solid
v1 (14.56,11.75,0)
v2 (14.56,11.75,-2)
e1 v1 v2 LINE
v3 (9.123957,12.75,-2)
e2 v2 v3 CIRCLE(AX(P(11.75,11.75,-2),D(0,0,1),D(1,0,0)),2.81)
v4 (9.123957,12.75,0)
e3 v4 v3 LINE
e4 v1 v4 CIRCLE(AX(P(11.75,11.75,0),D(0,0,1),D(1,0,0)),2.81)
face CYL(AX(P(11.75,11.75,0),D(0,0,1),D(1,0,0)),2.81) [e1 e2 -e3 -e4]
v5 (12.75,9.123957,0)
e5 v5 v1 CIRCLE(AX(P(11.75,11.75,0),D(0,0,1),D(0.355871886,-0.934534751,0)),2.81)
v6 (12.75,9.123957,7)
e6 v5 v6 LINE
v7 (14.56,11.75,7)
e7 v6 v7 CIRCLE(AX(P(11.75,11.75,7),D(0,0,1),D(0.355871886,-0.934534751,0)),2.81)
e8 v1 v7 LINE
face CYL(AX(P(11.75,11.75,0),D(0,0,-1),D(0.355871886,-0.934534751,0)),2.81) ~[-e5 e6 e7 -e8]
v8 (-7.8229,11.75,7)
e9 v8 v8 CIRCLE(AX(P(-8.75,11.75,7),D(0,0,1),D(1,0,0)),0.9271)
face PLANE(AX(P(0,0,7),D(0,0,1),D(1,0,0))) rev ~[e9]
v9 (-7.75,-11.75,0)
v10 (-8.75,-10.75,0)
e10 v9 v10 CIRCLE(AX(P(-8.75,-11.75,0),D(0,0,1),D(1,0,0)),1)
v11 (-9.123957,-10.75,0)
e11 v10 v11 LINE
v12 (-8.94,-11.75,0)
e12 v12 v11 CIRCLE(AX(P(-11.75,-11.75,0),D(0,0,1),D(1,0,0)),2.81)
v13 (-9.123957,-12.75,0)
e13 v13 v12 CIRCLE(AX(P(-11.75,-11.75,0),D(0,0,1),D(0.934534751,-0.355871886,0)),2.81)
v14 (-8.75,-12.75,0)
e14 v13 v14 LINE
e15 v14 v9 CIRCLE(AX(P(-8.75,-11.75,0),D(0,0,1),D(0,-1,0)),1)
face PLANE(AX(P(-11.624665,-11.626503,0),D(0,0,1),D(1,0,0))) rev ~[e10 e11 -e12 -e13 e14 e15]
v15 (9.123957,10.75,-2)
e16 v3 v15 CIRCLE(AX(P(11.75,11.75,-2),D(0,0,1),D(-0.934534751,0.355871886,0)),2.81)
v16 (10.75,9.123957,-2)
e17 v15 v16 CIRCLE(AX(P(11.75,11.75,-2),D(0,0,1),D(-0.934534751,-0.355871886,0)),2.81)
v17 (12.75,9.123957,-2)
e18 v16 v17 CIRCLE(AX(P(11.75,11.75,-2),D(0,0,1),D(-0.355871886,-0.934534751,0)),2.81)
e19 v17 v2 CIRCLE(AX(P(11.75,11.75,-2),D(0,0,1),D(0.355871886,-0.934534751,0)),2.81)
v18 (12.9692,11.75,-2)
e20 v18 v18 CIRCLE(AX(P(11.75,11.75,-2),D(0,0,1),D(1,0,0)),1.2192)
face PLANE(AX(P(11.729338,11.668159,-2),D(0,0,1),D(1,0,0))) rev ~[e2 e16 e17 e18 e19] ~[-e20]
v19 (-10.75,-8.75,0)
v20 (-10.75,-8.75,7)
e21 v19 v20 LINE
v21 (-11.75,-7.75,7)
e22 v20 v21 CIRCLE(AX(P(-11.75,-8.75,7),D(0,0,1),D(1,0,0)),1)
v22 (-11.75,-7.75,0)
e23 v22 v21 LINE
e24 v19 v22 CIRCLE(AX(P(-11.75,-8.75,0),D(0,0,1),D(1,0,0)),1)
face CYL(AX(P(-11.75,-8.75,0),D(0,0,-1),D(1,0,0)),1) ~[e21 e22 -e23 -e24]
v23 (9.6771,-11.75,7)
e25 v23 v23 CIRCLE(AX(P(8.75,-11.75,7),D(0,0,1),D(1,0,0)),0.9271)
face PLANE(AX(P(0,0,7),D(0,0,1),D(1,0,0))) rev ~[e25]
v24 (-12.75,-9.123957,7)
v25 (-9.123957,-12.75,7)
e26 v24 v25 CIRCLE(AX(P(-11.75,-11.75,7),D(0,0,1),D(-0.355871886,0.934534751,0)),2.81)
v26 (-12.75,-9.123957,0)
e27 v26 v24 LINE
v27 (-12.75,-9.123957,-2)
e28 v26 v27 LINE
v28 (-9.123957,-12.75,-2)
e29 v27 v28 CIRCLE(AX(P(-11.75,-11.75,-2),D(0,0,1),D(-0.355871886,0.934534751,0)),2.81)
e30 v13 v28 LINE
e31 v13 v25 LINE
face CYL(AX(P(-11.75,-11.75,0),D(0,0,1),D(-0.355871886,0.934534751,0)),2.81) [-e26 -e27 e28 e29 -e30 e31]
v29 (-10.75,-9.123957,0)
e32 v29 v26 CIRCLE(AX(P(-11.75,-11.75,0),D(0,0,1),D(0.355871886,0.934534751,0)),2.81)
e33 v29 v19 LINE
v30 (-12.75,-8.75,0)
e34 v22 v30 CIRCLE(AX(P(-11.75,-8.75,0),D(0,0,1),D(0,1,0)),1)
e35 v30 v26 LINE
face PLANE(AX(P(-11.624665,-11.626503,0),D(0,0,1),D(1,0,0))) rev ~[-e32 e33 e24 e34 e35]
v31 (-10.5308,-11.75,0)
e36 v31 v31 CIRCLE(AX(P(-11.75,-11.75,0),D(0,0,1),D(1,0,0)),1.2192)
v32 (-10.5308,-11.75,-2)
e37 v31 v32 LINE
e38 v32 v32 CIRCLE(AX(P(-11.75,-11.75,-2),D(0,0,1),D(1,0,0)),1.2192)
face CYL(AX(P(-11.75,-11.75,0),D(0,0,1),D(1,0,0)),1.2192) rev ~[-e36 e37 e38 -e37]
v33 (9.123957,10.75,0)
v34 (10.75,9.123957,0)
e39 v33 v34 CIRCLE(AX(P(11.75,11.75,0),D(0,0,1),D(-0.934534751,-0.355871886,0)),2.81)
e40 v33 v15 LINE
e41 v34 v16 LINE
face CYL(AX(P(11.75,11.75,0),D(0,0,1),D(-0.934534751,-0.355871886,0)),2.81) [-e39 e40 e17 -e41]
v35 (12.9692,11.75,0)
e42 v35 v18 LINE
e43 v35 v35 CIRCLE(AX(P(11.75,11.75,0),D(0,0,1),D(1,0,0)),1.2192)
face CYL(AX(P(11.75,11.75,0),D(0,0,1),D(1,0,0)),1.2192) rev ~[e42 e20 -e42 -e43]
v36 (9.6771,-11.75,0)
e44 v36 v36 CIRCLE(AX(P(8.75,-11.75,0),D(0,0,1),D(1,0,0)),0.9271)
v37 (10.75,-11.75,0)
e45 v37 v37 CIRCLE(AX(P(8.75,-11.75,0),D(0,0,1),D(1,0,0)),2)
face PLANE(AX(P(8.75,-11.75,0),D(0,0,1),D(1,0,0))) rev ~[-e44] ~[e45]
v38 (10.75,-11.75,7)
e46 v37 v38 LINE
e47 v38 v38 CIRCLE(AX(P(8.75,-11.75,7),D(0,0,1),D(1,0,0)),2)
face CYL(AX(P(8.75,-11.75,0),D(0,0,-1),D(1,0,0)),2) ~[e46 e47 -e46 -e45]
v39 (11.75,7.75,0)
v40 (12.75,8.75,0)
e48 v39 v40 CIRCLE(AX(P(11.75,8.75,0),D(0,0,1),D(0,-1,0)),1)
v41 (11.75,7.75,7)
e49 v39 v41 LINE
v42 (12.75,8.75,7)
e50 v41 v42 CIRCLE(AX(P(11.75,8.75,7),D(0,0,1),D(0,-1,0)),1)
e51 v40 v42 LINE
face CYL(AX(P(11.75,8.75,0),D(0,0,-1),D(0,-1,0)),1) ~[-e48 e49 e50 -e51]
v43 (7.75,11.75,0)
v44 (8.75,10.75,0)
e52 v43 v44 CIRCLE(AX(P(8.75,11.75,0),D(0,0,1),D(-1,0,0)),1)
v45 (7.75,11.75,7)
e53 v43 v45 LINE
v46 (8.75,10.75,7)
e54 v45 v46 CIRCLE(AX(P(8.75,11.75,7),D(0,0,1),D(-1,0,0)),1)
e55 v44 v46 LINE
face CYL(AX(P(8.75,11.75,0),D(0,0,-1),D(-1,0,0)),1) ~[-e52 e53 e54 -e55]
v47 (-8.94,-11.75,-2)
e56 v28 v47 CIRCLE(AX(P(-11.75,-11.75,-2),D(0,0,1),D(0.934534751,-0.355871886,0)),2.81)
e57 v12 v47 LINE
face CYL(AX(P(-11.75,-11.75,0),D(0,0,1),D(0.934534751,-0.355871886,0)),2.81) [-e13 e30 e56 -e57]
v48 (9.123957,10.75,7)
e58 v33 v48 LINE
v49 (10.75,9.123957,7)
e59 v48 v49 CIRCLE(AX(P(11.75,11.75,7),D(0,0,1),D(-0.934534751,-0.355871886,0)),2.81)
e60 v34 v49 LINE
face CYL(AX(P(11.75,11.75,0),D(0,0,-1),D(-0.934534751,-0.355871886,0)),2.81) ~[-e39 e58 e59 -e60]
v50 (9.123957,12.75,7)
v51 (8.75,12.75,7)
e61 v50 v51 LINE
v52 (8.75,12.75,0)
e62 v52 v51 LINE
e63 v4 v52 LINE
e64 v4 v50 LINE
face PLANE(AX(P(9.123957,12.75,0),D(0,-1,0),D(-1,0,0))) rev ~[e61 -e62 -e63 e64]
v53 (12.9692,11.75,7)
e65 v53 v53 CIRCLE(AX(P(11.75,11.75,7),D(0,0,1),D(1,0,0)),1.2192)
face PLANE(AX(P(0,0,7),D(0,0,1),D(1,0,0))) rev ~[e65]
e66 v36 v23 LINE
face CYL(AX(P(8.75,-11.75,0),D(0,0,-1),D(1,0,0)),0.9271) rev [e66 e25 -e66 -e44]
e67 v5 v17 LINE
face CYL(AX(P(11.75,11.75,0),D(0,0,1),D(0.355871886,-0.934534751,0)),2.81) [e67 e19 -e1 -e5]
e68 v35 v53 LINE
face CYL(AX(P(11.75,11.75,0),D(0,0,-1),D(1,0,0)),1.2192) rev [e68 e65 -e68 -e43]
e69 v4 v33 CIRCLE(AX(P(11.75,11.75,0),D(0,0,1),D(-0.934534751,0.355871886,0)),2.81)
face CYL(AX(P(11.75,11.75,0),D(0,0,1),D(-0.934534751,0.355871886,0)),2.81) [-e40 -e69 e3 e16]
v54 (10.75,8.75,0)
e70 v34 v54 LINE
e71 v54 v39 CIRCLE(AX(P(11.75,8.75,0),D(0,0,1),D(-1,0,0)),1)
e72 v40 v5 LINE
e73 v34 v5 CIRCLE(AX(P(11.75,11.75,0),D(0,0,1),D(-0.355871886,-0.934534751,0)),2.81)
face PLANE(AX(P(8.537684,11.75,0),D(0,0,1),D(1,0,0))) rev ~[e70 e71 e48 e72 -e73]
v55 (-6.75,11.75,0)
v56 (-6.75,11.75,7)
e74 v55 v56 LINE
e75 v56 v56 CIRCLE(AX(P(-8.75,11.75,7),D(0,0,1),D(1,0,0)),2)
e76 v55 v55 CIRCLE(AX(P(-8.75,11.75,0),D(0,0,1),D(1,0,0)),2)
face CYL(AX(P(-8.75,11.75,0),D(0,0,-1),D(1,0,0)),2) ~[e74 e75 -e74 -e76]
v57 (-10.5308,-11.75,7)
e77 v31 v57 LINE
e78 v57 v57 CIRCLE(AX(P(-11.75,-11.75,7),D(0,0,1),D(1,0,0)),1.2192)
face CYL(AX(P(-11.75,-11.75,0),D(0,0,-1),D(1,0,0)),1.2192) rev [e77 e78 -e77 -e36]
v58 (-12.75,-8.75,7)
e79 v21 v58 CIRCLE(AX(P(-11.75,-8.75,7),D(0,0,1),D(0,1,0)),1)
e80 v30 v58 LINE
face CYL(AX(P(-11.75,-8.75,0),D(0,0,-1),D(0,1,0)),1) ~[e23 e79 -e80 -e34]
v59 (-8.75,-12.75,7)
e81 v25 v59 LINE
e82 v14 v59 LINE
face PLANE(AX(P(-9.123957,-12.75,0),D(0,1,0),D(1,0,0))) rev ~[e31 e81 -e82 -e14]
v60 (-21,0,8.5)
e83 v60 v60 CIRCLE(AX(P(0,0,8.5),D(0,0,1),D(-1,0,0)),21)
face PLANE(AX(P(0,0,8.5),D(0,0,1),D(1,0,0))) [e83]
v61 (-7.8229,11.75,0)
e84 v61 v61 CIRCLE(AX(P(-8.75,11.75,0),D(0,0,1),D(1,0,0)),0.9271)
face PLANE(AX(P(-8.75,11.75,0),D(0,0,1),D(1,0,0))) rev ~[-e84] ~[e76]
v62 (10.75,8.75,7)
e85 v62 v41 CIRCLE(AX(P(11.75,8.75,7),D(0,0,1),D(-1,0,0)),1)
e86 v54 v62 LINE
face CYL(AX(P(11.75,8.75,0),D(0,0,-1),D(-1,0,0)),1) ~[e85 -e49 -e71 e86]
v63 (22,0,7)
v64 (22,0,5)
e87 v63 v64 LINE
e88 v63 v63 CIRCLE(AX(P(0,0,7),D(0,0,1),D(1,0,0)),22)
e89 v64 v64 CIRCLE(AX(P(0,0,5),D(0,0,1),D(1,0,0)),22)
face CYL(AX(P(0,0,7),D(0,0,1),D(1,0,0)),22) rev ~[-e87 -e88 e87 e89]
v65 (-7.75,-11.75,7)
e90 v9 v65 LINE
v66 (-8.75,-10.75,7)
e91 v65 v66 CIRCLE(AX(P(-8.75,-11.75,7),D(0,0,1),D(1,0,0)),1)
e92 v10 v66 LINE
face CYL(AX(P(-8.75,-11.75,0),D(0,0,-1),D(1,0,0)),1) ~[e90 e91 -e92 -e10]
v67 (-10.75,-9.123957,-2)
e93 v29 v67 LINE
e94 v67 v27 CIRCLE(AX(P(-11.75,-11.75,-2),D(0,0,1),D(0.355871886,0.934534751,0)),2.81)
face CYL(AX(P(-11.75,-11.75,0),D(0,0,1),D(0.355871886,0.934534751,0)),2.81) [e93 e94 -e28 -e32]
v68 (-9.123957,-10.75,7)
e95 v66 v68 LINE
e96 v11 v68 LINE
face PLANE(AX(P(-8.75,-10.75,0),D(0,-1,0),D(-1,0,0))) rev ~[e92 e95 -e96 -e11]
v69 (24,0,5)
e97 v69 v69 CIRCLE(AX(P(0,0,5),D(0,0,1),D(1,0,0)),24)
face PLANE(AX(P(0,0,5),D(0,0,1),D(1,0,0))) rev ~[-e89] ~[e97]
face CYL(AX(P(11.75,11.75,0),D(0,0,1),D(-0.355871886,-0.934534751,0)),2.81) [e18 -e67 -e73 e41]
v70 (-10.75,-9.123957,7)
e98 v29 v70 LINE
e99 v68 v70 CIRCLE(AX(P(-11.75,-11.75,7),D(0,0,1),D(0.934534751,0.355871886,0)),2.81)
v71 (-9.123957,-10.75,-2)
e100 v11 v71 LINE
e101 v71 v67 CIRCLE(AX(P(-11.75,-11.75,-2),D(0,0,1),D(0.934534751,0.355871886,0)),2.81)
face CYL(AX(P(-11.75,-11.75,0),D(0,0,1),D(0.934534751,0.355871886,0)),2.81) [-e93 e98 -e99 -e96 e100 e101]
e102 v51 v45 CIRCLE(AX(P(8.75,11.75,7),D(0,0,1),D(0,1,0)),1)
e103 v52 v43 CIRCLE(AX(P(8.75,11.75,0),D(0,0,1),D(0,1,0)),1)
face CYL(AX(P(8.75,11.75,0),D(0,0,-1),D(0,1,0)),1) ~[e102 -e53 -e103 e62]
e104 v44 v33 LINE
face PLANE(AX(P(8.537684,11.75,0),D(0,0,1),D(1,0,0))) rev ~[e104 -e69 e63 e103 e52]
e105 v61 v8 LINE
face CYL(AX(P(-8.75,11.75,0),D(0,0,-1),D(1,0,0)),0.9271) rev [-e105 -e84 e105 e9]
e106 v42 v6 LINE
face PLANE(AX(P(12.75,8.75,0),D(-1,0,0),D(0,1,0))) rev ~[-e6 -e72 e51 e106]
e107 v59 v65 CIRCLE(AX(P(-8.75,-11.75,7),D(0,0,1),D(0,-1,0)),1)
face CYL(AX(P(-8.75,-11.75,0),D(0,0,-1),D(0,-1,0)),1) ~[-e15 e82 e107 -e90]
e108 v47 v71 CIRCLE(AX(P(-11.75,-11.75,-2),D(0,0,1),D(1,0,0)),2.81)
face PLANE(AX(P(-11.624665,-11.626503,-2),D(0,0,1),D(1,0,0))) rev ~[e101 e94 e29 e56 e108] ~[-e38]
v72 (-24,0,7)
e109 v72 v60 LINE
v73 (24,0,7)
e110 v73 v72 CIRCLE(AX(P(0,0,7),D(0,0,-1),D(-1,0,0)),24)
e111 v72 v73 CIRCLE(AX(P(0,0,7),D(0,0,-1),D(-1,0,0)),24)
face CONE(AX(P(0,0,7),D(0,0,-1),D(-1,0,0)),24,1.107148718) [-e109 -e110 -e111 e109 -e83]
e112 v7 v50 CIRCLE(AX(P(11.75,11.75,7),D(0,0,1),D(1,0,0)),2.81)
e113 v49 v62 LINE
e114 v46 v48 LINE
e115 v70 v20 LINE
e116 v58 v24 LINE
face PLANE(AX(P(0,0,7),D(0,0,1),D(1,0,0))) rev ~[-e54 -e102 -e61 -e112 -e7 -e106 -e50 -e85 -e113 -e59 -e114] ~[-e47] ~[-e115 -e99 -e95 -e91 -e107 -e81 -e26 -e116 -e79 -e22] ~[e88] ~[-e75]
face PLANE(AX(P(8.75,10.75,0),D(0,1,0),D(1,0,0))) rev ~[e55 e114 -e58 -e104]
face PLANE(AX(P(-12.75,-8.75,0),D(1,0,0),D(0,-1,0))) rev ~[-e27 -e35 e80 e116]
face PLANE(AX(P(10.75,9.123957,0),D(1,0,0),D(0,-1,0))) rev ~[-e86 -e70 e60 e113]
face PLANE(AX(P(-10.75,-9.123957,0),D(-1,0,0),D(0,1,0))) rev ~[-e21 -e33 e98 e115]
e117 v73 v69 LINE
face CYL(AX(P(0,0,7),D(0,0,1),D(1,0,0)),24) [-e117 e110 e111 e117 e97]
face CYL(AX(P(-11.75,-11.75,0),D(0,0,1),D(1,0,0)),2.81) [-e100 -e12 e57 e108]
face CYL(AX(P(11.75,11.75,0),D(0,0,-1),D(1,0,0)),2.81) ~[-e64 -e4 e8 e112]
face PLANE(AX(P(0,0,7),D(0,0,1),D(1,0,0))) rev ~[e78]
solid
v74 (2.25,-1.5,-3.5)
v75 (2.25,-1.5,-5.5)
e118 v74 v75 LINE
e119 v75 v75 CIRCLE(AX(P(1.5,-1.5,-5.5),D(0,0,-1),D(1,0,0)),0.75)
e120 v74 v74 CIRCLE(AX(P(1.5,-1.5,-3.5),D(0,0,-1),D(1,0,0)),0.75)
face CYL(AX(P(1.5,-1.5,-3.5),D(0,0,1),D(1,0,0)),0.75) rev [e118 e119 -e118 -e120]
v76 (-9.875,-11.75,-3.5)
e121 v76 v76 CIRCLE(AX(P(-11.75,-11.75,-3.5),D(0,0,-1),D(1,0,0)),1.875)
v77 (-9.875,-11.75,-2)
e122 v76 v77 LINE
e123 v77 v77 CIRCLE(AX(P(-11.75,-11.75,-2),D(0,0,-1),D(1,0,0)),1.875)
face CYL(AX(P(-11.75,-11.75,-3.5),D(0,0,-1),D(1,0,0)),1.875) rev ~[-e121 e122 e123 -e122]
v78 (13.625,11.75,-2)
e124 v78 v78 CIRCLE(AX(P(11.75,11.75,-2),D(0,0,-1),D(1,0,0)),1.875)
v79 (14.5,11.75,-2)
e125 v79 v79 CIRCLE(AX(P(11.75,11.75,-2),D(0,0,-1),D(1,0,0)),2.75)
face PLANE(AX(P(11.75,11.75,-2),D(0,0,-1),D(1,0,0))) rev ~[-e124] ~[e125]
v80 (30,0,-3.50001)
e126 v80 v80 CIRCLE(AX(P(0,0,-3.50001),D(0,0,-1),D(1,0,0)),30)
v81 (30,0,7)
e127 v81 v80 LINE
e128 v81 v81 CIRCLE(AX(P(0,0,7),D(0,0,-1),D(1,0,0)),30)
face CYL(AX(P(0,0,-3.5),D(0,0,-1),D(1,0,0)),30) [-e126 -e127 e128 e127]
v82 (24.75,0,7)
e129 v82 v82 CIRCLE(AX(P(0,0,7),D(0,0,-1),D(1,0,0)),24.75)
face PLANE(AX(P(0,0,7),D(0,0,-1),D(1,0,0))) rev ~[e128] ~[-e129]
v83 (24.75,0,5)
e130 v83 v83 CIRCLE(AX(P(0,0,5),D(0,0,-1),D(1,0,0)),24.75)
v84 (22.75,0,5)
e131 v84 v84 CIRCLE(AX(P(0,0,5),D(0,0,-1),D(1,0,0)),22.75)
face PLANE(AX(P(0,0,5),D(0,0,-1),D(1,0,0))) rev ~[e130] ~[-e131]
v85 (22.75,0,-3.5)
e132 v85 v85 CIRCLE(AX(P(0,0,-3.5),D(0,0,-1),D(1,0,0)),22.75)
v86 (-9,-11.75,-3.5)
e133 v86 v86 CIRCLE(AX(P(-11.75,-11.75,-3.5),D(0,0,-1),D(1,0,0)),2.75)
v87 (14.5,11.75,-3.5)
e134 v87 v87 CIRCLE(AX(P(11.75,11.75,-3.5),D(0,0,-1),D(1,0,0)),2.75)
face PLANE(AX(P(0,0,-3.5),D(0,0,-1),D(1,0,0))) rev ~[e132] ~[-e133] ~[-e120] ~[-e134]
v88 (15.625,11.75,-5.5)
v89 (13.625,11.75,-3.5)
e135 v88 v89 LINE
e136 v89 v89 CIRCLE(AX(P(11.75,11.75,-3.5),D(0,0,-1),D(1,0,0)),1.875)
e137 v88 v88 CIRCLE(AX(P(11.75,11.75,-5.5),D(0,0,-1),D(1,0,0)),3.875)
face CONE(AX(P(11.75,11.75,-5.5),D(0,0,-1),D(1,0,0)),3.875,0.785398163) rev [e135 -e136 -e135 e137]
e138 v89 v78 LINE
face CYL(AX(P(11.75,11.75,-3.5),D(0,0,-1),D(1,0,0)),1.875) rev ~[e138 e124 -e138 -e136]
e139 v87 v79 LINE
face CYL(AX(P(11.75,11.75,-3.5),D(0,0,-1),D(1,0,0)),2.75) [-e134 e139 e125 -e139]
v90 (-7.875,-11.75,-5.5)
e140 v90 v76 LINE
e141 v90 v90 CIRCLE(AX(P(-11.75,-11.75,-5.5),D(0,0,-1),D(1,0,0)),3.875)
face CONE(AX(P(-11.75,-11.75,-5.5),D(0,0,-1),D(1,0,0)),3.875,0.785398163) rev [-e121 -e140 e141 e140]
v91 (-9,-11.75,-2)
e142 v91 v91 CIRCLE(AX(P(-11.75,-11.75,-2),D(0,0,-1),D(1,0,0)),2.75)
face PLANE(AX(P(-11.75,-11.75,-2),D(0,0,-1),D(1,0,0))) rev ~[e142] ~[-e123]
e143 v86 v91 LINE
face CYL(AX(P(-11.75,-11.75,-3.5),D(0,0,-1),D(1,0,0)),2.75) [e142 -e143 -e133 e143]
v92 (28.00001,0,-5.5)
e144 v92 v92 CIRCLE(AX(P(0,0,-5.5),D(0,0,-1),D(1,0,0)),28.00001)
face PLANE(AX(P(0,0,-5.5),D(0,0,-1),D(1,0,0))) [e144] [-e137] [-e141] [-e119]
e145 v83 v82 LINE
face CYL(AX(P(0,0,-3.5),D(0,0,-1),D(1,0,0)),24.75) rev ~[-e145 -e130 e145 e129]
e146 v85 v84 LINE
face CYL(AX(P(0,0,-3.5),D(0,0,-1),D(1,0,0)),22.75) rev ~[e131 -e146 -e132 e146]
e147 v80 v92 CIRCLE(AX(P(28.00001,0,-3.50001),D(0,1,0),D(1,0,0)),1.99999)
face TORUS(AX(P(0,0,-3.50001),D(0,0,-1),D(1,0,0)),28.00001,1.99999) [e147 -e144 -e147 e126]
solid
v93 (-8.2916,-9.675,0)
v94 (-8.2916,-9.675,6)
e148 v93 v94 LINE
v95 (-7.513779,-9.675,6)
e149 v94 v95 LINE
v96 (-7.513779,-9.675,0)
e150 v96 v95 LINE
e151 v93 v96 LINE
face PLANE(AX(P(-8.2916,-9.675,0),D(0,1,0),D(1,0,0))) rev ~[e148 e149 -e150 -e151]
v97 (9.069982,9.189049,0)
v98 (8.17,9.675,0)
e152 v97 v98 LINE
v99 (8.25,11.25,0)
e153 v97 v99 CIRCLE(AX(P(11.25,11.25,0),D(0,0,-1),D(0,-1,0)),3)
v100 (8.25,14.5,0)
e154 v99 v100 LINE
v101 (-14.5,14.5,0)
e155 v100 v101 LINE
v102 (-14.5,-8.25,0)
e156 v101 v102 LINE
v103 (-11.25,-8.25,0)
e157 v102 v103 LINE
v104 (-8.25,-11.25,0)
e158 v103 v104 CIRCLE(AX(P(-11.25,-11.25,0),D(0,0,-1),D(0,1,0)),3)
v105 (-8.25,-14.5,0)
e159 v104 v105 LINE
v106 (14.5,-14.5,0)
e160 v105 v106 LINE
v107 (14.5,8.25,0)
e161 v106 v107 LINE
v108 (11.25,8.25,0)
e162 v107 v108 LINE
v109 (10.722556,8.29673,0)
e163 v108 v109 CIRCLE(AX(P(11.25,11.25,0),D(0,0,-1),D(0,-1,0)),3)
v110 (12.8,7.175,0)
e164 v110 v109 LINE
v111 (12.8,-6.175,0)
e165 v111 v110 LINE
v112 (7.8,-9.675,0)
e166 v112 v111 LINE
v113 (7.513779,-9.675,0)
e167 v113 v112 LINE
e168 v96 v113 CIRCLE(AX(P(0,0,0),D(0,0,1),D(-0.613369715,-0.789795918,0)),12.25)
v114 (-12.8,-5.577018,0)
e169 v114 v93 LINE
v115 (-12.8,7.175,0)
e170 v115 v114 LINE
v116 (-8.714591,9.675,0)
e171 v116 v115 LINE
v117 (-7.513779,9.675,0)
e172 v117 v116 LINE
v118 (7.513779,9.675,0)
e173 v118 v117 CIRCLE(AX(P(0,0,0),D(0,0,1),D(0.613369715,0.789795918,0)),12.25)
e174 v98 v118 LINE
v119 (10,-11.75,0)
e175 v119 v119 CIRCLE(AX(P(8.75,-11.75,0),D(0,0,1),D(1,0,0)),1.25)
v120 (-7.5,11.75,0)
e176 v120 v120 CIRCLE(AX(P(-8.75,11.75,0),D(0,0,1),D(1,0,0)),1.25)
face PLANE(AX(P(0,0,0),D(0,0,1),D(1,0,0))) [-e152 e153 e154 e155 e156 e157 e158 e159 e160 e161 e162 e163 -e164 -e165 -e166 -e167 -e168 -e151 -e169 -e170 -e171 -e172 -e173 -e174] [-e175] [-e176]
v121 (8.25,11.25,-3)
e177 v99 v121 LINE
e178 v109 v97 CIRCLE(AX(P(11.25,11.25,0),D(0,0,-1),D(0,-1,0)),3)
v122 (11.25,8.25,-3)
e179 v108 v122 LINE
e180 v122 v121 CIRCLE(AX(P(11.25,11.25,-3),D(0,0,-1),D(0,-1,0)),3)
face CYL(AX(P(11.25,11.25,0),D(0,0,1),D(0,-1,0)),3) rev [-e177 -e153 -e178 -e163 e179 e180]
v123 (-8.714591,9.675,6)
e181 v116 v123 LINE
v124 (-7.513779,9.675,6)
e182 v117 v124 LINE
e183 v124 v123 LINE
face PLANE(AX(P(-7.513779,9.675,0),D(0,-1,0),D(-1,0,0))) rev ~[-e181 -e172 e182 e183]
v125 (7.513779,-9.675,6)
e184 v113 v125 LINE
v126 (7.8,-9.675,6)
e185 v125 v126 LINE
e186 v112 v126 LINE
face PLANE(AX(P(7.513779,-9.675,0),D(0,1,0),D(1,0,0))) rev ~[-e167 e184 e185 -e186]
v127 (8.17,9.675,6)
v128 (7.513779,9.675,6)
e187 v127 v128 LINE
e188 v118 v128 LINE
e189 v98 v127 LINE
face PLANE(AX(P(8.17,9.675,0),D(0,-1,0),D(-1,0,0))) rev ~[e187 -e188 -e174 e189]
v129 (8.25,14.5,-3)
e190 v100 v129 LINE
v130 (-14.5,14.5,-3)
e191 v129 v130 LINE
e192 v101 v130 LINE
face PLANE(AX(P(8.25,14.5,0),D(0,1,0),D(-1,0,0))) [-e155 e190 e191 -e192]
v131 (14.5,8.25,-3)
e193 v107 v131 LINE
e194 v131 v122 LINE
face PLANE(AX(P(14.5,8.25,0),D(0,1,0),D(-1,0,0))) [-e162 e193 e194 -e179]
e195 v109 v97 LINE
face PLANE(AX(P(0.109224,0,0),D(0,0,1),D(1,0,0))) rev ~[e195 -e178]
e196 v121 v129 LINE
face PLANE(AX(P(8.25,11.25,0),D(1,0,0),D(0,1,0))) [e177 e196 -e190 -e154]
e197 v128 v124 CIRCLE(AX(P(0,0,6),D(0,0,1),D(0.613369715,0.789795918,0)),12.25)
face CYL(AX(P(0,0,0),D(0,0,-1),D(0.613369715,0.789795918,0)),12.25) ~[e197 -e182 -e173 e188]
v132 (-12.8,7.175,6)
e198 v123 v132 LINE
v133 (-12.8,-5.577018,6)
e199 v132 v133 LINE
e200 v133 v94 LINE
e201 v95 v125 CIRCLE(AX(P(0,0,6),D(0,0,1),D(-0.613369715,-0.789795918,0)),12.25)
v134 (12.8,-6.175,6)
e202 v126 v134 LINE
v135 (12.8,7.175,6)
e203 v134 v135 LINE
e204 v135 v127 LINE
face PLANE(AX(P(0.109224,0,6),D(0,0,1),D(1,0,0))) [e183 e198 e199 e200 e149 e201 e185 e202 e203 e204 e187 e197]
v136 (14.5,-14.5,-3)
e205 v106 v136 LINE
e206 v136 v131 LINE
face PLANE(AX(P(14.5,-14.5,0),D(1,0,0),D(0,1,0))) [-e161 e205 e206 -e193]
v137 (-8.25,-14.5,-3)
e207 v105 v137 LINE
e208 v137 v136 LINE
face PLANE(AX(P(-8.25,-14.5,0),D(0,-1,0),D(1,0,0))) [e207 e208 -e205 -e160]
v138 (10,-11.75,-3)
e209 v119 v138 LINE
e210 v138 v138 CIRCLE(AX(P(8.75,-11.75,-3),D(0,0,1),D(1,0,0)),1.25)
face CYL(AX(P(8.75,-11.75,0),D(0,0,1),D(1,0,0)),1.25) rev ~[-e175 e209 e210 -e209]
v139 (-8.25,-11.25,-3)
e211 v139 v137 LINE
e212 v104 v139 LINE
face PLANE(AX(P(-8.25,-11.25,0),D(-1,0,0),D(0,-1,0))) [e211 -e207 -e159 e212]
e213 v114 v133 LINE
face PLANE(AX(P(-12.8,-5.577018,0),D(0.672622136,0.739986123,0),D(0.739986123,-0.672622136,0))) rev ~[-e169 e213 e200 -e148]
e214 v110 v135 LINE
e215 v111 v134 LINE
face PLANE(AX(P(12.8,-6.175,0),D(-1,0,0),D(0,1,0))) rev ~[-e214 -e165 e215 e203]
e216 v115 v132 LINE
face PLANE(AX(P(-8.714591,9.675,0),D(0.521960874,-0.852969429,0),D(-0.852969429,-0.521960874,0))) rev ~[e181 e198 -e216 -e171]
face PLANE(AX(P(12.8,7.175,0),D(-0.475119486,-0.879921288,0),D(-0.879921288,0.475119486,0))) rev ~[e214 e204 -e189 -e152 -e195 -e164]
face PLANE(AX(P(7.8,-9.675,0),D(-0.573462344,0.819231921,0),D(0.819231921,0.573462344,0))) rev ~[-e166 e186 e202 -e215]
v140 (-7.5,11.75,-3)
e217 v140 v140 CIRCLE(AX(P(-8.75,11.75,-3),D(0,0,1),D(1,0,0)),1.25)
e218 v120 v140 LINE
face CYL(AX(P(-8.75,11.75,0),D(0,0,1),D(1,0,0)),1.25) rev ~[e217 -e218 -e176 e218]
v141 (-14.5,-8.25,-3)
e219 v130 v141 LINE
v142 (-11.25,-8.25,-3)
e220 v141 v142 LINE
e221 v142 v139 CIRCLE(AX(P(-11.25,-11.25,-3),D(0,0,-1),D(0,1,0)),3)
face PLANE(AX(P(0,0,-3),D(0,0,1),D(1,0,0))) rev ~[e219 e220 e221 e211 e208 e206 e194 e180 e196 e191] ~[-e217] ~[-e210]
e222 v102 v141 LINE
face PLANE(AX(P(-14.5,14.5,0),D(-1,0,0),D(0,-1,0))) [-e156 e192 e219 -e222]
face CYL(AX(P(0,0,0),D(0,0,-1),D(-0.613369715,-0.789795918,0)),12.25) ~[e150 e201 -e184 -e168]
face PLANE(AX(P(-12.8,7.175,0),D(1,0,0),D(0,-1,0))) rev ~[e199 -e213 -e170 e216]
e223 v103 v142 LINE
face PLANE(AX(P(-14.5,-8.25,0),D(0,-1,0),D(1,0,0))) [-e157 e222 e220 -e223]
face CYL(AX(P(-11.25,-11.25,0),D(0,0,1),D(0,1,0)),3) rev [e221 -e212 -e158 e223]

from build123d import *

# Parameters (mm, degrees)
F0_R      = 1.25
F1_DEPTH  = 3
F3_DEPTH  = 6
F4_R      = 1.2192
F5_DEPTH  = 7
F4_R_2    = 2
F4_R_3    = 0.9271
F7_R      = 24
F7_R_2    = 22
F7_R_3    = 21
F8_DEPTH  = 1.5
F9_DEPTH  = 2
F12_DEPTH = 2
F14_R     = 30
F14_R_2   = 24.75
F14_R_3   = 22.75
F14_R_4   = 2.75
F14_R_5   = 0.75
F14_R_6   = 1.875
F15_DEPTH = 2
F16_DEPTH = 1.5
F18_DEPTH = 8.5
F19_DEPTH = 10.5
F20_R     = 1.99999


# Not quite as in the source:
# - a fillet or chamfer that OpenCascade refuses, or shapes differently, is made with other operations: its cross-section is extruded or revolved along the edge and cut away or added
# - a fillet or chamfer is up to 0.001 mm smaller than in the source, because OpenCascade refuses the exact size


with BuildPart() as f1:
    # F0 (on Top) → F1 (new body)
    with BuildSketch(Plane.XY):
        with BuildLine():
            Line((8.25, 11.25), (8.25, 14.5))
            Line((8.25, 14.5), (-14.5, 14.5))
            Line((-14.5, 14.5), (-14.5, -8.25))
            Line((-14.5, -8.25), (-11.25, -8.25))
            ThreePointArc((-11.25, -8.25), (-9.1286796564, -9.1286796564), (-8.25, -11.25))
            Line((-8.25, -11.25), (-8.25, -14.5))
            Line((-8.25, -14.5), (14.5, -14.5))
            Line((14.5, -14.5), (14.5, 8.25))
            Line((14.5, 8.25), (11.25, 8.25))
            ThreePointArc((11.25, 8.25), (9.1286796564, 9.1286796564), (8.25, 11.25))
        make_face()
        with Locations((8.75, -11.75)):
            Circle(F0_R, mode=Mode.SUBTRACT)
        with Locations((-8.75, 11.75)):
            Circle(F0_R, mode=Mode.SUBTRACT)
    extrude(amount=-F1_DEPTH)

    # F2 (on Top) → F3 (join)
    with BuildSketch(Plane.XY):
        with BuildLine():
            ThreePointArc((7.5137790093, -9.675), (11.0024154817, -5.3860331941), (12.25, 0))
            ThreePointArc((12.25, 0), (11.0024154817, 5.3860331941), (7.5137790093, 9.675))
            Line((7.5137790093, 9.675), (-7.5137790093, 9.675))
            ThreePointArc((-7.5137790093, 9.675), (-12.25, 0), (-7.5137790093, -9.675))
            Line((-7.5137790093, -9.675), (7.5137790093, -9.675))
        make_face()
        with BuildLine():
            ThreePointArc((-7.5137790093, -9.675), (0, -12.25), (7.5137790093, -9.675))
            Line((7.5137790093, -9.675), (-7.5137790093, -9.675))
        make_face()
        with BuildLine():
            ThreePointArc((-7.5137790093, -9.675), (-12.25, 0), (-7.5137790093, 9.675))
            Line((-7.5137790093, 9.675), (-8.714591153, 9.675))
            Line((-8.714591153, 9.675), (-12.8, 7.175))
            Line((-12.8, 7.175), (-12.8, -5.5770184845))
            Line((-12.8, -5.5770184845), (-8.2916002721, -9.675))
            Line((-8.2916002721, -9.675), (-7.5137790093, -9.675))
        make_face()
        with BuildLine():
            ThreePointArc((7.5137790093, 9.675), (11.0024154817, 5.3860331941), (12.25, 0))
            ThreePointArc((12.25, 0), (11.0024154817, -5.3860331941), (7.5137790093, -9.675))
            Line((7.5137790093, -9.675), (7.8, -9.675))
            Line((7.8, -9.675), (12.8, -6.175))
            Line((12.8, -6.175), (12.8, 7.175))
            Line((12.8, 7.175), (8.17, 9.675))
            Line((8.17, 9.675), (7.5137790093, 9.675))
        make_face()
        with BuildLine():
            Line((-7.5137790093, 9.675), (7.5137790093, 9.675))
            ThreePointArc((7.5137790093, 9.675), (0, 12.25), (-7.5137790093, 9.675))
        make_face()
    extrude(amount=F3_DEPTH)


with BuildPart() as f5:
    # F4 (on Top) → F5 (new body)
    with BuildSketch(Plane.XY):
        with BuildLine():
            ThreePointArc((-9.1239573499, -12.75), (-8.9863719636, -12.2583896898), (-8.94, -11.75))
            ThreePointArc((-8.94, -11.75), (-8.9863719636, -11.2416103102), (-9.1239573499, -10.75))
            ThreePointArc((-9.1239573499, -10.75), (-9.7630299449, -9.7630299449), (-10.75, -9.1239573499))
            ThreePointArc((-10.75, -9.1239573499), (-11.75, -8.94), (-12.75, -9.1239573499))
            ThreePointArc((-12.75, -9.1239573499), (-13.7369700551, -13.7369700551), (-9.1239573499, -12.75))
        make_face()
        with Locations((-11.75, -11.75)):
            Circle(F4_R, mode=Mode.SUBTRACT)
        with BuildLine():
            ThreePointArc((-9.1239573499, -10.75), (-8.9863719636, -11.2416103102), (-8.94, -11.75))
            ThreePointArc((-8.94, -11.75), (-8.9863719636, -12.2583896898), (-9.1239573499, -12.75))
            Line((-9.1239573499, -12.75), (-8.75, -12.75))
            ThreePointArc((-8.75, -12.75), (-8.0428932188, -12.4571067812), (-7.75, -11.75))
            ThreePointArc((-7.75, -11.75), (-8.0428932188, -11.0428932188), (-8.75, -10.75))
            Line((-8.75, -10.75), (-9.1239573499, -10.75))
        make_face()
        with BuildLine():
            ThreePointArc((-12.75, -9.1239573499), (-11.75, -8.94), (-10.75, -9.1239573499))
            Line((-10.75, -9.1239573499), (-10.75, -8.75))
            ThreePointArc((-10.75, -8.75), (-11.0428932188, -8.0428932188), (-11.75, -7.75))
            ThreePointArc((-11.75, -7.75), (-12.4571067812, -8.0428932188), (-12.75, -8.75))
            Line((-12.75, -8.75), (-12.75, -9.1239573499))
        make_face()
    extrude(amount=F5_DEPTH)



with BuildPart() as f5b:
    # F4 (on Top) → F5, piece 2 (new body)
    with BuildSketch(Plane.XY):
        with Locations((8.75, -11.75)):
            Circle(F4_R_2)
        with Locations((8.75, -11.75)):
            Circle(F4_R_3, mode=Mode.SUBTRACT)
    extrude(amount=F5_DEPTH)


with BuildPart() as f5c:
    # F4 (on Top) → F5, piece 3 (new body)
    with BuildSketch(Plane.XY):
        with BuildLine():
            ThreePointArc((9.1239573499, 10.75), (8.94, 11.75), (9.1239573499, 12.75))
            Line((9.1239573499, 12.75), (8.75, 12.75))
            ThreePointArc((8.75, 12.75), (8.0428932188, 12.4571067812), (7.75, 11.75))
            ThreePointArc((7.75, 11.75), (8.0428932188, 11.0428932188), (8.75, 10.75))
            Line((8.75, 10.75), (9.1239573499, 10.75))
        make_face()
        with BuildLine():
            Line((12.75, 8.75), (12.75, 9.1239573499))
            ThreePointArc((12.75, 9.1239573499), (11.75, 8.94), (10.75, 9.1239573499))
            Line((10.75, 9.1239573499), (10.75, 8.75))
            ThreePointArc((10.75, 8.75), (11.0428932188, 8.0428932188), (11.75, 7.75))
            ThreePointArc((11.75, 7.75), (12.4571067812, 8.0428932188), (12.75, 8.75))
        make_face()
        with BuildLine():
            ThreePointArc((12.75, 9.1239573499), (14.0636659223, 10.1553056719), (14.56, 11.75))
            ThreePointArc((14.56, 11.75), (12.2583896898, 14.5136280364), (9.1239573499, 12.75))
            ThreePointArc((9.1239573499, 12.75), (8.94, 11.75), (9.1239573499, 10.75))
            ThreePointArc((9.1239573499, 10.75), (9.7630299449, 9.7630299449), (10.75, 9.1239573499))
            ThreePointArc((10.75, 9.1239573499), (11.75, 8.94), (12.75, 9.1239573499))
        make_face()
        with Locations((11.75, 11.75)):
            Circle(F4_R, mode=Mode.SUBTRACT)
    extrude(amount=F5_DEPTH)


with BuildPart() as f5d:
    # F4 (on Top) → F5, piece 4 (new body)
    with BuildSketch(Plane.XY):
        with Locations((-8.75, 11.75)):
            Circle(F4_R_2)
        with Locations((-8.75, 11.75)):
            Circle(F4_R_3, mode=Mode.SUBTRACT)
    extrude(amount=F5_DEPTH)


with BuildPart() as f5_1:
    add(f5.part)

    add(f5b.part)  # F8 merges F5b

    add(f5c.part)  # F8 merges F5c

    add(f5d.part)  # F8 merges F5d
    # F7 (on offset) → F8 (join)
    with BuildSketch(Plane.XY.offset(7)):
        Circle(F7_R)
        Circle(F7_R_2, mode=Mode.SUBTRACT)
        Circle(F7_R_2)
        Circle(F7_R_3, mode=Mode.SUBTRACT)
        Circle(F7_R_3)
    extrude(amount=F8_DEPTH)

    # F4 (on Top) → F9 (join)
    with BuildSketch(Plane.XY):
        with BuildLine():
            ThreePointArc((-9.1239573499, -12.75), (-8.9863719636, -12.2583896898), (-8.94, -11.75))
            ThreePointArc((-8.94, -11.75), (-8.9863719636, -11.2416103102), (-9.1239573499, -10.75))
            ThreePointArc((-9.1239573499, -10.75), (-9.7630299449, -9.7630299449), (-10.75, -9.1239573499))
            ThreePointArc((-10.75, -9.1239573499), (-11.75, -8.94), (-12.75, -9.1239573499))
            ThreePointArc((-12.75, -9.1239573499), (-13.7369700551, -13.7369700551), (-9.1239573499, -12.75))
        make_face()
        with Locations((-11.75, -11.75)):
            Circle(F4_R, mode=Mode.SUBTRACT)
        with BuildLine():
            ThreePointArc((12.75, 9.1239573499), (14.0636659223, 10.1553056719), (14.56, 11.75))
            ThreePointArc((14.56, 11.75), (12.2583896898, 14.5136280364), (9.1239573499, 12.75))
            ThreePointArc((9.1239573499, 12.75), (8.94, 11.75), (9.1239573499, 10.75))
            ThreePointArc((9.1239573499, 10.75), (9.7630299449, 9.7630299449), (10.75, 9.1239573499))
            ThreePointArc((10.75, 9.1239573499), (11.75, 8.94), (12.75, 9.1239573499))
        make_face()
        with Locations((11.75, 11.75)):
            Circle(F4_R, mode=Mode.SUBTRACT)
    extrude(amount=-F9_DEPTH)

    # F10 (on Front) → F11 (revolve, cut)
    with BuildSketch(Plane.XZ):
        Polygon((-24, 8.5), (-24, 7), (-21, 8.5), align=None)
    revolve(axis=Axis((0, 0, 4.2050974444), (0, 0, 1)), mode=Mode.SUBTRACT)

    # F7 (on offset) → F12 (join)
    with BuildSketch(Plane.XY.offset(7)):
        Circle(F7_R)
        Circle(F7_R_2, mode=Mode.SUBTRACT)
    extrude(amount=-F12_DEPTH)


with BuildPart() as f15:
    # F14 (on offset) → F15 (new body)
    with BuildSketch(Plane(origin=(0, 0, -3.5), x_dir=(1, 0, 0), z_dir=(0, 0, -1))):
        Circle(F14_R)
        Circle(F14_R_2, mode=Mode.SUBTRACT)
        Circle(F14_R_2)
        Circle(F14_R_3, mode=Mode.SUBTRACT)
        Circle(F14_R_3)
        with Locations((11.75, -11.75)):
            Circle(F14_R_4, mode=Mode.SUBTRACT)
        with Locations((-11.75, 11.75)):
            Circle(F14_R_4, mode=Mode.SUBTRACT)
        with Locations((1.5, 1.5)):
            Circle(F14_R_5, mode=Mode.SUBTRACT)
        with Locations((-11.75, 11.75)):
            Circle(F14_R_4)
        with Locations((-11.75, 11.75)):
            Circle(F14_R_6, mode=Mode.SUBTRACT)
        with Locations((11.75, -11.75)):
            Circle(F14_R_4)
        with Locations((11.75, -11.75)):
            Circle(F14_R_6, mode=Mode.SUBTRACT)
    extrude(amount=F15_DEPTH)

    # F14 (on offset) → F16 (join)
    with BuildSketch(Plane(origin=(0, 0, -3.5), x_dir=(1, 0, 0), z_dir=(0, 0, -1))):
        with Locations((11.75, -11.75)):
            Circle(F14_R_4)
        with Locations((11.75, -11.75)):
            Circle(F14_R_6, mode=Mode.SUBTRACT)
        with Locations((-11.75, 11.75)):
            Circle(F14_R_4)
        with Locations((-11.75, 11.75)):
            Circle(F14_R_6, mode=Mode.SUBTRACT)
    extrude(amount=-F16_DEPTH)

    # F17: chamfer of 2 on 2 edges, made by hand

    # F17_s1 → F17_t2 (revolve, cut)
    with BuildSketch(Plane.XZ.offset(11.75)):
        Polygon((-7.875, -5.5), (-9.875, -3.5), (-9.875, -5.5), align=None)
    revolve(axis=Axis((-11.75, -11.75, -5.5), (0, 0, -1)), mode=Mode.SUBTRACT)

    # F17_s3 → F17_t4 (revolve, cut)
    with BuildSketch(Plane.XZ.offset(-11.75)):
        Polygon((15.625, -5.5), (13.625, -3.5), (13.625, -5.5), align=None)
    revolve(axis=Axis((11.75, 11.75, -5.5), (0, 0, -1)), mode=Mode.SUBTRACT)

    # F14 (on offset) → F18 (join, through all)
    with BuildSketch(Plane(origin=(0, 0, -3.5), x_dir=(1, 0, 0), z_dir=(0, 0, -1))):
        Circle(F14_R_2)
        Circle(F14_R_3, mode=Mode.SUBTRACT)
    extrude(amount=-F18_DEPTH)

    # F14 (on offset) → F19 (join)
    with BuildSketch(Plane(origin=(0, 0, -3.5), x_dir=(1, 0, 0), z_dir=(0, 0, -1))):
        Circle(F14_R)
        Circle(F14_R_2, mode=Mode.SUBTRACT)
    extrude(amount=-F19_DEPTH)

    # F20 (radius 2 in the source; OpenCascade refuses exactly that, so slightly less here)
    f20_edges = [f15.edges().sort_by_distance(p)[0] for p in [
        (-30, 0, -5.5),
    ]]
    fillet(f20_edges, radius=F20_R)


solid = Compound([f1.part, f5_1.part, f15.part])
